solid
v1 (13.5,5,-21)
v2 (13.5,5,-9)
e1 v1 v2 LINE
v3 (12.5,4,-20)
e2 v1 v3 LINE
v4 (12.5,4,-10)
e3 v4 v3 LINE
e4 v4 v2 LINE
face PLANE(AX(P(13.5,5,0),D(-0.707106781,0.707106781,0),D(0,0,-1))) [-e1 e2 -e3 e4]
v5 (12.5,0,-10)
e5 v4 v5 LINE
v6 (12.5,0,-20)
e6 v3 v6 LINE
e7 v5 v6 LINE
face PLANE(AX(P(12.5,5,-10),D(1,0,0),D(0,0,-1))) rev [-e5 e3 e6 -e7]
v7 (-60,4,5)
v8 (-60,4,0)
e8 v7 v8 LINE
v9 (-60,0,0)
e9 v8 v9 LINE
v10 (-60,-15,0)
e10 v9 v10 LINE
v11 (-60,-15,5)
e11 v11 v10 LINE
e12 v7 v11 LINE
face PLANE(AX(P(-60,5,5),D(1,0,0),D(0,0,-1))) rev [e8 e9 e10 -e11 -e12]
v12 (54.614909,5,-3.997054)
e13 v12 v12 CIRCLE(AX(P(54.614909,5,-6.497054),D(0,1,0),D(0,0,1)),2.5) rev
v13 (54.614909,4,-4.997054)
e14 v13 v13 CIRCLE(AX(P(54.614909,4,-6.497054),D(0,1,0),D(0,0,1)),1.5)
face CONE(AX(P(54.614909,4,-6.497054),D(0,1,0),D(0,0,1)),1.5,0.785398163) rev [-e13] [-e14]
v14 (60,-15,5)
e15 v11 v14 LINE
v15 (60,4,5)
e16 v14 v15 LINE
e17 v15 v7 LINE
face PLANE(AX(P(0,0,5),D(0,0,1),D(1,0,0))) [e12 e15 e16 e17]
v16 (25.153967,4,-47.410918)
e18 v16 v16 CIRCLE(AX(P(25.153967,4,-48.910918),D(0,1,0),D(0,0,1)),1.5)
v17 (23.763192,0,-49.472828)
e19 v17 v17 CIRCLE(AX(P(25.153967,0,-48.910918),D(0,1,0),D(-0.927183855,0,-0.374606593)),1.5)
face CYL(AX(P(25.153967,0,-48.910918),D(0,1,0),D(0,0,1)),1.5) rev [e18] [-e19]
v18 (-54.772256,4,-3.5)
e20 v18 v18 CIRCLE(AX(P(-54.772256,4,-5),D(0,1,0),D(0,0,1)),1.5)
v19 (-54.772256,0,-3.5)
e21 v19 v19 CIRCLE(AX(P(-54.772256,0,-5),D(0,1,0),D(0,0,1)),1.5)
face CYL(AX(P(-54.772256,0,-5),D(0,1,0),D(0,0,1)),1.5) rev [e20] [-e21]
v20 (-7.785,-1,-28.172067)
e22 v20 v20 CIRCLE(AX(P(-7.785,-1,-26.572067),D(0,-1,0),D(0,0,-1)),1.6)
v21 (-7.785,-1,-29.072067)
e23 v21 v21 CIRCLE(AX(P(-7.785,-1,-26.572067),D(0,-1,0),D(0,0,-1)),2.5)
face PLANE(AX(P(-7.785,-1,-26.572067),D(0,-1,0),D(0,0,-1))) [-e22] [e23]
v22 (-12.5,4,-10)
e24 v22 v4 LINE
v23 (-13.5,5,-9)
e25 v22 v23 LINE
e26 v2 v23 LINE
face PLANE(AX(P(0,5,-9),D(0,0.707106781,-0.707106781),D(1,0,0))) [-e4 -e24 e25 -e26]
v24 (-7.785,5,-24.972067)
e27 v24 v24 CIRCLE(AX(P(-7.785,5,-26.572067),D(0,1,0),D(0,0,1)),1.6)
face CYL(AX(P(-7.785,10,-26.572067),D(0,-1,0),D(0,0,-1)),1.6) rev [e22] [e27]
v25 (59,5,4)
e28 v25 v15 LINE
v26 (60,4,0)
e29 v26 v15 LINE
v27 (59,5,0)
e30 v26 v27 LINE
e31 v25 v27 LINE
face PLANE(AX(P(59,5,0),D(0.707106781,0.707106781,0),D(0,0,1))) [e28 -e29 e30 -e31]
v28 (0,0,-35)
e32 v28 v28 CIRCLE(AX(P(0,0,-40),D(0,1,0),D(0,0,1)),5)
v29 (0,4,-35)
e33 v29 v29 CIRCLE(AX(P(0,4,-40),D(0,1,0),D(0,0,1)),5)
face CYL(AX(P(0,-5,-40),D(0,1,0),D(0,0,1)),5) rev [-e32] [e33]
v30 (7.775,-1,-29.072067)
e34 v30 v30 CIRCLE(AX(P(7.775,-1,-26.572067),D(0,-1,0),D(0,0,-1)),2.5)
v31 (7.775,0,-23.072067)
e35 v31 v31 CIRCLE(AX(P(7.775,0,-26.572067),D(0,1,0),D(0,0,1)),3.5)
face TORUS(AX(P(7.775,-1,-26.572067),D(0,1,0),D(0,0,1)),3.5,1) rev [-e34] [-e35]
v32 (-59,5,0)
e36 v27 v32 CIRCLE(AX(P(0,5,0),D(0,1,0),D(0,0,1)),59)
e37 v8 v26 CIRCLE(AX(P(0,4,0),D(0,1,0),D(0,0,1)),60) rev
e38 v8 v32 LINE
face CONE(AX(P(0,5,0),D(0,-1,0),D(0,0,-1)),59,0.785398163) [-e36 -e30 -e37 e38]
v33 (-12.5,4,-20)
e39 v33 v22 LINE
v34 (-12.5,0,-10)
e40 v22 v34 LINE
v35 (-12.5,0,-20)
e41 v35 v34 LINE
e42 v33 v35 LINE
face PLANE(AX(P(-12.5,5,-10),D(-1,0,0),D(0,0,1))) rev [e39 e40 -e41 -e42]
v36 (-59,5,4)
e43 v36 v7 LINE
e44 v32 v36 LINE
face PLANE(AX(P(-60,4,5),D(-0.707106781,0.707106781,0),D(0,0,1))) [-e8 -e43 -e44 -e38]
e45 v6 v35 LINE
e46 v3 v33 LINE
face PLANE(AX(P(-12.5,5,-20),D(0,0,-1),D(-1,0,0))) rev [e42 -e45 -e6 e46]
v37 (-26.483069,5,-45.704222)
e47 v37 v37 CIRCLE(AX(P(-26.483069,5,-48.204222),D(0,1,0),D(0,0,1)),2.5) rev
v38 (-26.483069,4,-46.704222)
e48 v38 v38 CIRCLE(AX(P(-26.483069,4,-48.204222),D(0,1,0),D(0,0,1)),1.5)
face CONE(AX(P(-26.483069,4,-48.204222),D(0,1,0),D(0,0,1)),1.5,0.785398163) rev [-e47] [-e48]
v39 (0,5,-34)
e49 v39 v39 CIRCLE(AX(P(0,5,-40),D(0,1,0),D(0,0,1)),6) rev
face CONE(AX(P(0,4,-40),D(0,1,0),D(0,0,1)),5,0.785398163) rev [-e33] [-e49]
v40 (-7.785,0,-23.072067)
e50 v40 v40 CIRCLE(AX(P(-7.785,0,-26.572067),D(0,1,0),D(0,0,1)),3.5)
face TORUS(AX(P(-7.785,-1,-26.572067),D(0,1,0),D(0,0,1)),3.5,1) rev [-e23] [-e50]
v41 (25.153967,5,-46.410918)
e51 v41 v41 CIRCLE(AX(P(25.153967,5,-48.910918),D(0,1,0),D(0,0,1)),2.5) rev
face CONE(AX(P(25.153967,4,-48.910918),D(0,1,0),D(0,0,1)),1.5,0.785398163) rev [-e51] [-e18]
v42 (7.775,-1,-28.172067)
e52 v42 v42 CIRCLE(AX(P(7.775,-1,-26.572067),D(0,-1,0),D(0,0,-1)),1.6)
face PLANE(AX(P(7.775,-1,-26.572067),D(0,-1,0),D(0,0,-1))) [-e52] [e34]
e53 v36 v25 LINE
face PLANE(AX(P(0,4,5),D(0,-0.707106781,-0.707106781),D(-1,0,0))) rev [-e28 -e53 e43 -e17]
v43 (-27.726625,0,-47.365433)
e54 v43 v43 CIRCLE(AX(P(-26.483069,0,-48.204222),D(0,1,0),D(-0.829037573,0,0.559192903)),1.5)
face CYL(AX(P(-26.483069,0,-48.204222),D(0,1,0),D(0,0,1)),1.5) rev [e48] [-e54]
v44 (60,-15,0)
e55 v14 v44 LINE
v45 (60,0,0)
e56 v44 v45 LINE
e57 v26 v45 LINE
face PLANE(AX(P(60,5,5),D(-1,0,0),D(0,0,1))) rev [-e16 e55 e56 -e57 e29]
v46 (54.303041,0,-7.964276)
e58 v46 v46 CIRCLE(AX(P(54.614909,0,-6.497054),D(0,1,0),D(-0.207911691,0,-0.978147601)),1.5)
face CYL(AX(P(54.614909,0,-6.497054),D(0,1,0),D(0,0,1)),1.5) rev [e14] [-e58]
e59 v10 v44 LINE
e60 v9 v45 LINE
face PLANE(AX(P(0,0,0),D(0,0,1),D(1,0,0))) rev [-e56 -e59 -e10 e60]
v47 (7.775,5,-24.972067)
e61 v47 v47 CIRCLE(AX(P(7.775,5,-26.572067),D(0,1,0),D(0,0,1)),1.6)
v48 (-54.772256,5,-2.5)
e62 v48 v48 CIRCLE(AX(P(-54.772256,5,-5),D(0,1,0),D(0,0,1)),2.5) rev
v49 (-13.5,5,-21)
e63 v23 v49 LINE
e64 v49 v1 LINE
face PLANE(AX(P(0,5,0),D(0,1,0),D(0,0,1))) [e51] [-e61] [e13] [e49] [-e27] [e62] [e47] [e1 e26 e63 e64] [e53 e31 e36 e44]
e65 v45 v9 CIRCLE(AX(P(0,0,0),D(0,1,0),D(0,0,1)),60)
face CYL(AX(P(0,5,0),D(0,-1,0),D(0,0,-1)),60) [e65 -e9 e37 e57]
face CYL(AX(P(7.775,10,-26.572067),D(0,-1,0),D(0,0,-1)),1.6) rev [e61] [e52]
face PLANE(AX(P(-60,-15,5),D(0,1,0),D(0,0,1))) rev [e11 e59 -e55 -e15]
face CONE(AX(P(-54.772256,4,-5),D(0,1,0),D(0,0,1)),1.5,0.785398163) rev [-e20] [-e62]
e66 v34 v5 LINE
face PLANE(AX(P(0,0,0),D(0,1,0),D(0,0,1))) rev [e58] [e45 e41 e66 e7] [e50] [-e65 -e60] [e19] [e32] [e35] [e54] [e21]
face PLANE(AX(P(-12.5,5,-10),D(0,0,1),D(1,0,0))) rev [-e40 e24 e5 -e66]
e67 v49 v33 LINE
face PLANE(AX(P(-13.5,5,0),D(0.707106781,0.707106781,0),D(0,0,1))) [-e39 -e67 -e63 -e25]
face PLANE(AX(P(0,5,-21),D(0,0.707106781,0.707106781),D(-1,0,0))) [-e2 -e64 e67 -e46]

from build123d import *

# Parameters (mm, degrees)
BOSS_EXTRUDE1_DEPTH = 5
SKETCH2_R           = 1.5
CUT_EXTRUDE1_DEPTH  = 5
CIRPATTERN1_COUNT   = 4
CIRPATTERN1_ANGLE   = 168
SKETCH8_W           = 25
SKETCH8_H           = 10
CUT_EXTRUDE3_DEPTH  = 5
SKETCH9_W           = 120
SKETCH9_H           = 20
BOSS_EXTRUDE5_DEPTH = 5
SKETCH10_R          = 5
CUT_EXTRUDE4_DEPTH  = 10
CHAMFER1_SIZE       = 1
CHAMFER2_SIZE       = 1
SKETCH5_R           = 1.6
CUT_EXTRUDE5_DEPTH  = 10
BOSS_EXTRUDE6_START = 1
SKETCH11_R          = 2.5
SKETCH11_R_2        = 1.6
BOSS_EXTRUDE6_DEPTH = 1
FILLET5_R           = 1


with BuildPart() as part:
    # Sketch1 → Boss-Extrude1 (new body)
    with BuildSketch(Plane(origin=(0, 0, 0), x_dir=(1, 0, 0), z_dir=(0, 1, 0))):
        with BuildLine():
            Line((-60, 0), (-25.75, 0))
            Line((-25.75, 0), (25.75, 0))
            Line((25.75, 0), (60, 0))
            ThreePointArc((60, 0), (0, 60), (-60, 0))
        make_face()
    extrude(amount=BOSS_EXTRUDE1_DEPTH)

    # Sketch2 → Cut-Extrude1 (cut)
    with BuildSketch(Plane(origin=(0, 5, 0), x_dir=(1, 0, 0), z_dir=(0, 1, 0))):
        with Locations(Location((-54.772255751, 5, 0), (0, 0, 270))):
            Circle(SKETCH2_R)
    cut_extrude1 = extrude(amount=-CUT_EXTRUDE1_DEPTH, mode=Mode.SUBTRACT)

    # CirPattern1: Cut-Extrude1 ×4 about axis
    cirpattern1_axis = Axis((0, 0, 0), (0, -1, 0))
    for i in range(1, CIRPATTERN1_COUNT):
        add(cut_extrude1.rotate(cirpattern1_axis, i * CIRPATTERN1_ANGLE / (CIRPATTERN1_COUNT - 1)), mode=Mode.SUBTRACT)

    # Sketch8 → Cut-Extrude3 (cut, symmetric)
    with BuildSketch(Plane(origin=(0, 0, 0), x_dir=(-1, 0, 0), z_dir=(0, -1, 0))):
        with Locations((0, 15)):
            Rectangle(SKETCH8_W, SKETCH8_H)
    extrude(amount=CUT_EXTRUDE3_DEPTH, both=True, mode=Mode.SUBTRACT)

    # Sketch9 → Boss-Extrude5 (add)
    with BuildSketch(Plane.XY):
        with Locations((0, -5)):
            Rectangle(SKETCH9_W, SKETCH9_H)
    extrude(amount=BOSS_EXTRUDE5_DEPTH)

    # Sketch10 → Cut-Extrude4 (cut)
    with BuildSketch(Plane(origin=(0, 5, 0), x_dir=(1, 0, 0), z_dir=(0, 1, 0))):
        with Locations(Location((0, 40, 0), (0, 0, 270))):
            Circle(SKETCH10_R)
    extrude(amount=-CUT_EXTRUDE4_DEPTH, mode=Mode.SUBTRACT)

    # Chamfer1
    chamfer1_edges = [part.edges().sort_by_distance(p)[0] for p in [
        (-54.772255751, 5, -6.5),
        (-25.239512501, 5, -49.043011823),
        (26.544743195, 5, -48.349008353),
        (54.926776539, 5, -5.029832898),
        (-12.5, 5, -15),
        (0, 5, -10),
        (12.5, 5, -15),
        (0, 5, -20),
        (0, 5, -45),
    ]]
    chamfer(chamfer1_edges, length=CHAMFER1_SIZE)

    # Chamfer2
    chamfer2_edges = [part.edges().sort_by_distance(p)[0] for p in [
        (0, 5, -60),
        (-60, 5, 2.5),
        (60, 5, 2.5),
        (0, 5, 5),
    ]]
    chamfer(chamfer2_edges, length=CHAMFER2_SIZE)

    # Sketch5 → Cut-Extrude5 (cut)
    with BuildSketch(Plane.XZ):
        with Locations(Location((-7.785, -26.572067281, 0), (0, 0, 270))):
            Circle(SKETCH5_R)
        with Locations(Location((7.775, -26.572067281, 0), (0, 0, 270))):
            Circle(SKETCH5_R)
    extrude(amount=-CUT_EXTRUDE5_DEPTH, mode=Mode.SUBTRACT)

    # Sketch11 → Boss-Extrude6 (add)
    # profile 1 of 2: a face of its own
    with BuildSketch(Plane.XZ.offset(BOSS_EXTRUDE6_START)):
        with Locations(Location((-7.785, -26.572067281, 0), (0, 0, 90))):
            Circle(SKETCH11_R)
        with Locations(Location((-7.785, -26.572067281, 0), (0, 0, 270))):
            Circle(SKETCH11_R_2, mode=Mode.SUBTRACT)
    # profile 2 of 2: a face of its own
    with BuildSketch(Plane.XZ.offset(BOSS_EXTRUDE6_START)):
        with Locations(Location((7.775, -26.572067281, 0), (0, 0, 90))):
            Circle(SKETCH11_R)
        with Locations(Location((7.775, -26.572067281, 0), (0, 0, 270))):
            Circle(SKETCH11_R_2, mode=Mode.SUBTRACT)
    extrude(amount=-BOSS_EXTRUDE6_DEPTH)

    # Fillet5
    fillet5_edges = [part.edges().sort_by_distance(p)[0] for p in [
        (-7.785, 0, -29.072067281),
        (7.775, 0, -29.072067281),
    ]]
    fillet(fillet5_edges, radius=FILLET5_R - 0.0001)  # a hair under: the kernel refuses the full size


solid = part.part
